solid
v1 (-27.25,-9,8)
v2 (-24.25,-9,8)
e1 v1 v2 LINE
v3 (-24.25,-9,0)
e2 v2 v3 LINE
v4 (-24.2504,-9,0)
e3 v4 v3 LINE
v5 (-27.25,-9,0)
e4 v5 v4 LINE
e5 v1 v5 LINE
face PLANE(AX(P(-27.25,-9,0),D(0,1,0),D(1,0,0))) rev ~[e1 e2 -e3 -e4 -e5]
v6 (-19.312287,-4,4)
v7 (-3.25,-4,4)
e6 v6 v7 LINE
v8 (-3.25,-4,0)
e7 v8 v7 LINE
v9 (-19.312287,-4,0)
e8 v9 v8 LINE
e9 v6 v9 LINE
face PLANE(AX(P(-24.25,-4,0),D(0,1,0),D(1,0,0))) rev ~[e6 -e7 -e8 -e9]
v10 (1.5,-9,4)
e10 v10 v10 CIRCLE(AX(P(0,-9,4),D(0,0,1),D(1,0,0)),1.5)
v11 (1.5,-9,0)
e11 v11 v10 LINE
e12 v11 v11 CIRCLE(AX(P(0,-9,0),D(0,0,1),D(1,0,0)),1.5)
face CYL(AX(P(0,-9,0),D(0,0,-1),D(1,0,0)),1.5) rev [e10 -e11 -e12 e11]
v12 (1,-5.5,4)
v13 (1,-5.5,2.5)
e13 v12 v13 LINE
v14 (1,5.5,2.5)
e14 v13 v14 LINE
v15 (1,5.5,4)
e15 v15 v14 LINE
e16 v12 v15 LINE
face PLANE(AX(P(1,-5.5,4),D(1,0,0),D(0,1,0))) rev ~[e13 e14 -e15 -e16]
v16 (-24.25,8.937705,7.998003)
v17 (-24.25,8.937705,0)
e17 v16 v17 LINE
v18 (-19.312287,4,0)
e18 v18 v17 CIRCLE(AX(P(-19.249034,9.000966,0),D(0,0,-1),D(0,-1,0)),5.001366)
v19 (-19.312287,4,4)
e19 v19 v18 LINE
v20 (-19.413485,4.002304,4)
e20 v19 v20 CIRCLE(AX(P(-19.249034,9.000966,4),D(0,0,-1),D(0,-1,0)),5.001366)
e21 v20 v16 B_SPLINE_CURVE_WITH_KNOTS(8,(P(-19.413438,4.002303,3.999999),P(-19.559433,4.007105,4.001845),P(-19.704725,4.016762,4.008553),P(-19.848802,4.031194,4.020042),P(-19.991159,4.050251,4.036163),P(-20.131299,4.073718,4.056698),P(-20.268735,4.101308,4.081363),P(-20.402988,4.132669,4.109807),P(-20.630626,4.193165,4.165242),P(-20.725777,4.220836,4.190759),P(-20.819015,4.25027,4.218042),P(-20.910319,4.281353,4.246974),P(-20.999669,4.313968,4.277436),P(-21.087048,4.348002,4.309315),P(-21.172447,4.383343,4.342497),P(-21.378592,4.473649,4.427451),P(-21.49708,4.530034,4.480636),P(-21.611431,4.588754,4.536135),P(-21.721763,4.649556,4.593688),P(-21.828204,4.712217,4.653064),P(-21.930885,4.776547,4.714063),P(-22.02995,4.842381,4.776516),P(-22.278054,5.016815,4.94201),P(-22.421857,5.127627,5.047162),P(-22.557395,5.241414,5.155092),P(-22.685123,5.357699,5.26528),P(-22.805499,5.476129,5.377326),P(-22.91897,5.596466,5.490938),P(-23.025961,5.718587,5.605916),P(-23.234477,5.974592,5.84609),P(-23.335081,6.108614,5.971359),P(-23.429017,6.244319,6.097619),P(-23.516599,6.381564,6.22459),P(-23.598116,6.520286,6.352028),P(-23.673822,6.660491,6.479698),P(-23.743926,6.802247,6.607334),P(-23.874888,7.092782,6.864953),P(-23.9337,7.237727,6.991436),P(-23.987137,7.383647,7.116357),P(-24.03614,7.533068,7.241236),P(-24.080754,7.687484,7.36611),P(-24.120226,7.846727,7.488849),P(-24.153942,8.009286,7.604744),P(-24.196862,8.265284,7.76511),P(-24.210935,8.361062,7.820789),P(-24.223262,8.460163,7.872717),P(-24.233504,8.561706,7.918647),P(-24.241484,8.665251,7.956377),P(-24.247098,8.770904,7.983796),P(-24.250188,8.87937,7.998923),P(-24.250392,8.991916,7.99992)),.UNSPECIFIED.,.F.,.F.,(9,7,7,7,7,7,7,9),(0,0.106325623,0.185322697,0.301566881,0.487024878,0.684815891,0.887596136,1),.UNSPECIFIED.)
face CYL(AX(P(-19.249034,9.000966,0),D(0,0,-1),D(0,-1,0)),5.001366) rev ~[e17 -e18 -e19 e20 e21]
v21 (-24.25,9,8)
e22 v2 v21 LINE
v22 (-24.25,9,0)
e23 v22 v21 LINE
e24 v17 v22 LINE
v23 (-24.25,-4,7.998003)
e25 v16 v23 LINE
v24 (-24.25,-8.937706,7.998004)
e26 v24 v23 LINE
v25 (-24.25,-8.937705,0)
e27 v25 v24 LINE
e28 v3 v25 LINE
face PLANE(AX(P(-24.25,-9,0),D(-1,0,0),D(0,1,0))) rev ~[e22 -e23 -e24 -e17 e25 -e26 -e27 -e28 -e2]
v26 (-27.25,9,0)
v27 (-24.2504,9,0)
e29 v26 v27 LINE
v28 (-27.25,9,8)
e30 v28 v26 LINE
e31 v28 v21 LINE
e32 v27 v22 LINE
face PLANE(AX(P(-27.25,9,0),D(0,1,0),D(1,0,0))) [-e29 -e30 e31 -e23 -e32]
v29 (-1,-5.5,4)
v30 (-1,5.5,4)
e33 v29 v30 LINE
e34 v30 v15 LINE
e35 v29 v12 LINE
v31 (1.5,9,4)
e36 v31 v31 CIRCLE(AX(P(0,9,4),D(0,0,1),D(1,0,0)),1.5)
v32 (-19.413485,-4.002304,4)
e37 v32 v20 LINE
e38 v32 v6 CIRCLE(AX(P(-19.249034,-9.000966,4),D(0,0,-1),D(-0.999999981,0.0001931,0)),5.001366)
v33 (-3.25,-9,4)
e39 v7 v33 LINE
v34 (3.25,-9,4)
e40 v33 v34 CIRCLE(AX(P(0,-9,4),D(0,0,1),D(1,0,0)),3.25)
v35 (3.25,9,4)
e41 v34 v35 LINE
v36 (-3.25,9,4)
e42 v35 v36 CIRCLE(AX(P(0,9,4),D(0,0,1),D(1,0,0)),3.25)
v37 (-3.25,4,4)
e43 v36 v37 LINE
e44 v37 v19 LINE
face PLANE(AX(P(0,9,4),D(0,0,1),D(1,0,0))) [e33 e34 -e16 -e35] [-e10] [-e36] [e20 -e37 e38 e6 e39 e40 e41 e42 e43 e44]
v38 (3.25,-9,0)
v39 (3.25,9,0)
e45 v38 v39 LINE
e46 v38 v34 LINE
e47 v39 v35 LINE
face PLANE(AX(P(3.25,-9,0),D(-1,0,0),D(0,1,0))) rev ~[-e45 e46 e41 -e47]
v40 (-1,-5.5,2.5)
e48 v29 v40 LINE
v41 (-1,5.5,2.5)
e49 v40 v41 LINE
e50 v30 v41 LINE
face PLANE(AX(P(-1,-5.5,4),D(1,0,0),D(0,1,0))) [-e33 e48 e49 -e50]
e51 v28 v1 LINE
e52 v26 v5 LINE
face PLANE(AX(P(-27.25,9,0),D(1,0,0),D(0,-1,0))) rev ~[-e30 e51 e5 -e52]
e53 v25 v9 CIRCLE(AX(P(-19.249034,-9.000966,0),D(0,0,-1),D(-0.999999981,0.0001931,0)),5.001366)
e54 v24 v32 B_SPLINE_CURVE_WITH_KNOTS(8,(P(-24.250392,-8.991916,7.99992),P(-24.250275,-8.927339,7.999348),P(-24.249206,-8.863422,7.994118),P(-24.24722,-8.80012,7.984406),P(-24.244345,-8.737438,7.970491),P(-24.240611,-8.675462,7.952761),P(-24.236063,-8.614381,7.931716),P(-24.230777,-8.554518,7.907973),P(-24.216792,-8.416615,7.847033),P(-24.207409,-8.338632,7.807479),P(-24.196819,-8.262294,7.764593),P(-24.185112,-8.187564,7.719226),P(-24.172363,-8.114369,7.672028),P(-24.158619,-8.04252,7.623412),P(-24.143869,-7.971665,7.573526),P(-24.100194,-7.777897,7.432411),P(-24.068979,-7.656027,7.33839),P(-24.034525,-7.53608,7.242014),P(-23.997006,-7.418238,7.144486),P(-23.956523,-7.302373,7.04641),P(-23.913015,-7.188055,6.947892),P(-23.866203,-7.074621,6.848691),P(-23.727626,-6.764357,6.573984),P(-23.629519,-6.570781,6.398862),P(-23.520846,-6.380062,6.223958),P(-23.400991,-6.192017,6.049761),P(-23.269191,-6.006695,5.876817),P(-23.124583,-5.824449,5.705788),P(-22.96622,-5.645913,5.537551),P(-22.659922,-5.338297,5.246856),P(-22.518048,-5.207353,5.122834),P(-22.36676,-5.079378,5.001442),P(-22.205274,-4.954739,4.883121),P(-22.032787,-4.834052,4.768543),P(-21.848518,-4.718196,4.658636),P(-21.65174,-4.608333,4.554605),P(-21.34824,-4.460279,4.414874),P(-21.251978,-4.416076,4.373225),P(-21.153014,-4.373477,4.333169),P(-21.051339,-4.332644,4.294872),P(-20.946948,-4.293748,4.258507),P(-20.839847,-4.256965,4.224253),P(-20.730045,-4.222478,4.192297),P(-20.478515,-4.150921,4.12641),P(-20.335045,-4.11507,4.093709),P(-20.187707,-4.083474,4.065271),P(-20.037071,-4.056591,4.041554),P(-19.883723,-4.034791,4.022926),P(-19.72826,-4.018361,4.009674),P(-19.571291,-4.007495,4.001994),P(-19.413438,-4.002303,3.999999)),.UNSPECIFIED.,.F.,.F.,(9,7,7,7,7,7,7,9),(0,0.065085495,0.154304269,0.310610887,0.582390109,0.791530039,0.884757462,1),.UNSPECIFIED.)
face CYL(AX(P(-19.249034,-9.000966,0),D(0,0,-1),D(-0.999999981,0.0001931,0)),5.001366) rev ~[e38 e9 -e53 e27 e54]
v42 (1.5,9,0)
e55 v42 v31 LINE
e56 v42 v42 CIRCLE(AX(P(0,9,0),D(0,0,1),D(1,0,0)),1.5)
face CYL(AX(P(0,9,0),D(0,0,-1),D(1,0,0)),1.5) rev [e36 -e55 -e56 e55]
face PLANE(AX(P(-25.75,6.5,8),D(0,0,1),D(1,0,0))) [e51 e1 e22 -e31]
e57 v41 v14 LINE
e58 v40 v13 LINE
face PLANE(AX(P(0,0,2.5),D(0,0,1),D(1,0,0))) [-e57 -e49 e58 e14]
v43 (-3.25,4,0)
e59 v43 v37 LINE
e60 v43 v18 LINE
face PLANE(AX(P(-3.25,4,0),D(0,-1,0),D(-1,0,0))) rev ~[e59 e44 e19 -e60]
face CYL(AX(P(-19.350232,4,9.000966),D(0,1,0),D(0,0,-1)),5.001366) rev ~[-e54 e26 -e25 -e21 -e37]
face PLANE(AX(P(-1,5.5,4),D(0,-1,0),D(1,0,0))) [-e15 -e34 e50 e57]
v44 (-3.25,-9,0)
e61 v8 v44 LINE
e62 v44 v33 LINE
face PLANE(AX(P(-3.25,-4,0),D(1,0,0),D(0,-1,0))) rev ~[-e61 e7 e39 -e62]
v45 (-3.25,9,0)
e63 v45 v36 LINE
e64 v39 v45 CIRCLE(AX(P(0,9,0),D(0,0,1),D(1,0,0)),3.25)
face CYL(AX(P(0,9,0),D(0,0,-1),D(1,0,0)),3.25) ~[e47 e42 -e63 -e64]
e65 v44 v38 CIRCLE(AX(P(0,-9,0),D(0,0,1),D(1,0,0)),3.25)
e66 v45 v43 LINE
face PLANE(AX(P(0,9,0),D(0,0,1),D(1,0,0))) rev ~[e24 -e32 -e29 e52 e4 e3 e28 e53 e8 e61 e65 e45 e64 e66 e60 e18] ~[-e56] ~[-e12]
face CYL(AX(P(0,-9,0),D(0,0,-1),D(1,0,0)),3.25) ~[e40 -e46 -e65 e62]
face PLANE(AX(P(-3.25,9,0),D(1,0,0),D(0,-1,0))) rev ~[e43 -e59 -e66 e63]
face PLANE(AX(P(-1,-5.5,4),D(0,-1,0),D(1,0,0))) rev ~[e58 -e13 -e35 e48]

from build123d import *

# Parameters (mm, degrees)
F0_R         = 1.5
F0_W         = 21
F0_H         = 8
F0_W_2       = 3
F0_H_2       = 5
F1_DEPTH     = 4
F2_W         = 2
F2_H         = 11
F3_DEPTH     = 1.5
F4_DEPTH     = 8
F5_T1_DEPTH  = 4
F5_T3_DEPTH  = 8
F5_T9_DEPTH  = 20.2494197933
F5_T14_DEPTH = 16.5024140205
F5_T22_DEPTH = 20.2494197933
F5_T27_DEPTH = 16.5024140205


# Not quite as in the source:
# - a fillet or chamfer that OpenCascade refuses, or shapes differently, is made with other operations: its cross-section is extruded or revolved along the edge and cut away or added


with BuildPart() as f1:
    # F0 (on Top) → F1 (new body)
    with BuildSketch(Plane.XY):
        with BuildLine():
            ThreePointArc((-3.25, 9), (0, 5.75), (3.25, 9))
            ThreePointArc((3.25, 9), (0, 12.25), (-3.25, 9))
        make_face()
        with Locations((0, 9)):
            Circle(F0_R, mode=Mode.SUBTRACT)
        with BuildLine():
            Line((3.25, -9), (3.25, 9))
            ThreePointArc((3.25, 9), (0, 5.75), (-3.25, 9))
            Line((-3.25, 9), (-3.25, 4))
            Line((-3.25, 4), (-3.25, -4))
            Line((-3.25, -4), (-3.25, -9))
            ThreePointArc((-3.25, -9), (0, -5.75), (3.25, -9))
        make_face()
        with BuildLine():
            ThreePointArc((-3.25, -9), (0, -12.25), (3.25, -9))
            ThreePointArc((3.25, -9), (0, -5.75), (-3.25, -9))
        make_face()
        with Locations((0, -9)):
            Circle(F0_R, mode=Mode.SUBTRACT)
        with Locations((-13.75, 0)):
            Rectangle(F0_W, F0_H)
        with Locations((-25.75, 0)):
            Rectangle(F0_W_2, F0_H)
        with Locations((-25.75, 6.5)):
            Rectangle(F0_W_2, F0_H_2)
        with Locations((-25.75, -6.5)):
            Rectangle(F0_W_2, F0_H_2)
    extrude(amount=F1_DEPTH)

    # F2 (on face) → F3 (cut)
    with BuildSketch(Plane.XY.offset(4)):
        Rectangle(F2_W, F2_H)
    extrude(amount=-F3_DEPTH, mode=Mode.SUBTRACT)

    # F0 (on Top) → F4 (join)
    with BuildSketch(Plane.XY):
        with Locations((-25.75, 6.5)):
            Rectangle(F0_W_2, F0_H_2)
        with Locations((-25.75, 0)):
            Rectangle(F0_W_2, F0_H)
        with Locations((-25.75, -6.5)):
            Rectangle(F0_W_2, F0_H_2)
    extrude(amount=F4_DEPTH)

    # F5: fillet of radius 5 on 3 edges, made by hand

    # F5_s2 → F5_t1 (join)
    with BuildSketch(Plane.XY):
        with BuildLine():
            ThreePointArc((-19.2490344078, 3.9996), (-22.785192534, 5.4641246619), (-24.2504, 8.9999999228))
            Line((-24.2504, 8.9999999228), (-24.7505365592, 8.9999033465))
            ThreePointArc((-24.7505365592, 8.9999033465), (-24.7501365685, 6.4999999614), (-24.7501365685, 4))
            Line((-24.7501365685, 4), (-24.25, 3.4998634315))
            ThreePointArc((-24.25, 3.4998634315), (-21.7495172039, 3.4998634315), (-19.2490344078, 3.4994634315))
            Line((-19.2490344078, 3.4994634315), (-19.2490344078, 3.9996))
        make_face()
        with BuildLine():
            ThreePointArc((-24.2504, -8.9999999228), (-22.785192534, -5.4641246619), (-19.2490344078, -3.9996))
            Line((-19.2490344078, -3.9996), (-19.2490344078, -3.4994634315))
            ThreePointArc((-19.2490344078, -3.4994634315), (-21.7495172039, -3.4998634315), (-24.25, -3.4998634315))
            Line((-24.25, -3.4998634315), (-24.7501365685, -4))
            ThreePointArc((-24.7501365685, -4), (-24.7501365685, -6.4999999614), (-24.7505365592, -8.9999033465))
            Line((-24.7505365592, -8.9999033465), (-24.2504, -8.9999999228))
        make_face()
    extrude(amount=F5_T1_DEPTH)

    # F5_s4 → F5_t3 (join)
    with BuildSketch(Plane.XZ.offset(-4)):
        with BuildLine():
            ThreePointArc((-19.350232099, 3.9996), (-22.5130680788, 5.126675133), (-24.2503919057, 7.9999199382))
            Line((-24.2503919057, 7.9999199382), (-24.7404078864, 7.8998153635))
            ThreePointArc((-24.7404078864, 7.8998153635), (-24.7501365685, 5.9999599691), (-24.7501365685, 4))
            Line((-24.7501365685, 4), (-24.25, 3.4998634315))
            ThreePointArc((-24.25, 3.4998634315), (-21.8001160495, 3.4998634315), (-19.350232099, 3.4994634315))
            Line((-19.350232099, 3.4994634315), (-19.350232099, 3.9996))
        make_face()
    extrude(amount=F5_T3_DEPTH)


with BuildPart() as f5_tool7:
    # F5_s8 → F5_t9 (new body)
    with BuildSketch(Plane.XZ.offset(-16.2494197933)):
        with BuildLine():
            ThreePointArc((-19.350232099, 3.9996), (-22.5130680788, 5.126675133), (-24.2503919057, 7.9999199382))
            Line((-24.2503919057, 7.9999199382), (-24.7404078864, 7.8998153635))
            ThreePointArc((-24.7404078864, 7.8998153635), (-24.7501365685, 5.9999599691), (-24.7501365685, 4))
            Line((-24.7501365685, 4), (-24.25, 3.4998634315))
            ThreePointArc((-24.25, 3.4998634315), (-21.8001160495, 3.4998634315), (-19.350232099, 3.4994634315))
            Line((-19.350232099, 3.4994634315), (-19.350232099, 3.9996))
        make_face()
    extrude(amount=F5_T9_DEPTH)

    split(bisect_by=Plane.XZ.offset(-4), keep=Keep.BOTTOM)

    split(bisect_by=Plane.XZ.offset(-9), keep=Keep.TOP)


with BuildPart() as f5_tool12:
    # F5_s13 → F5_t14 (new body)
    with BuildSketch(Plane.XY):
        with BuildLine():
            ThreePointArc((-19.2490344078, 3.9996), (-22.785192534, 5.4641246619), (-24.2504, 8.9999999228))
            Line((-24.2504, 8.9999999228), (-24.7505365592, 8.9999033465))
            ThreePointArc((-24.7505365592, 8.9999033465), (-24.7501365685, 6.4999999614), (-24.7501365685, 4))
            Line((-24.7501365685, 4), (-24.25, 3.4998634315))
            ThreePointArc((-24.25, 3.4998634315), (-21.7495172039, 3.4998634315), (-19.2490344078, 3.4994634315))
            Line((-19.2490344078, 3.4994634315), (-19.2490344078, 3.9996))
        make_face()
    extrude(amount=F5_T14_DEPTH)

    split(bisect_by=Plane.XY.offset(4), keep=Keep.TOP)

    split(bisect_by=Plane.XY.offset(8), keep=Keep.BOTTOM)


with BuildPart() as f5_tool7_1:
    add(f5_tool7.part)

    # F5_t17: intersect F5_tool12
    add(f5_tool12.part, mode=Mode.INTERSECT)


with BuildPart() as f1_1:
    add(f1.part)

    # F5_t5: union F5_tool7
    add(f5_tool7_1.part)


with BuildPart() as f5_tool20:
    # F5_s21 → F5_t22 (new body)
    with BuildSketch(Plane.XZ.offset(-4)):
        with BuildLine():
            ThreePointArc((-19.350232099, 3.9996), (-22.5130680788, 5.126675133), (-24.2503919057, 7.9999199382))
            Line((-24.2503919057, 7.9999199382), (-24.7404078864, 7.8998153635))
            ThreePointArc((-24.7404078864, 7.8998153635), (-24.7501365685, 5.9999599691), (-24.7501365685, 4))
            Line((-24.7501365685, 4), (-24.25, 3.4998634315))
            ThreePointArc((-24.25, 3.4998634315), (-21.8001160495, 3.4998634315), (-19.350232099, 3.4994634315))
            Line((-19.350232099, 3.4994634315), (-19.350232099, 3.9996))
        make_face()
    extrude(amount=F5_T22_DEPTH)

    split(bisect_by=Plane.XZ.offset(9), keep=Keep.BOTTOM)

    split(bisect_by=Plane.XZ.offset(4), keep=Keep.TOP)


with BuildPart() as f5_tool25:
    # F5_s26 → F5_t27 (new body)
    with BuildSketch(Plane.XY):
        with BuildLine():
            ThreePointArc((-24.2504, -8.9999999228), (-22.785192534, -5.4641246619), (-19.2490344078, -3.9996))
            Line((-19.2490344078, -3.9996), (-19.2490344078, -3.4994634315))
            ThreePointArc((-19.2490344078, -3.4994634315), (-21.7495172039, -3.4998634315), (-24.25, -3.4998634315))
            Line((-24.25, -3.4998634315), (-24.7501365685, -4))
            ThreePointArc((-24.7501365685, -4), (-24.7501365685, -6.4999999614), (-24.7505365592, -8.9999033465))
            Line((-24.7505365592, -8.9999033465), (-24.2504, -8.9999999228))
        make_face()
    extrude(amount=F5_T27_DEPTH)

    split(bisect_by=Plane.XY.offset(4), keep=Keep.TOP)

    split(bisect_by=Plane.XY.offset(8), keep=Keep.BOTTOM)


with BuildPart() as f5_tool20_1:
    add(f5_tool20.part)

    # F5_t30: intersect F5_tool25
    add(f5_tool25.part, mode=Mode.INTERSECT)


with BuildPart() as f1_2:
    add(f1_1.part)

    # F5_t18: union F5_tool20
    add(f5_tool20_1.part)


solid = f1_2.part
